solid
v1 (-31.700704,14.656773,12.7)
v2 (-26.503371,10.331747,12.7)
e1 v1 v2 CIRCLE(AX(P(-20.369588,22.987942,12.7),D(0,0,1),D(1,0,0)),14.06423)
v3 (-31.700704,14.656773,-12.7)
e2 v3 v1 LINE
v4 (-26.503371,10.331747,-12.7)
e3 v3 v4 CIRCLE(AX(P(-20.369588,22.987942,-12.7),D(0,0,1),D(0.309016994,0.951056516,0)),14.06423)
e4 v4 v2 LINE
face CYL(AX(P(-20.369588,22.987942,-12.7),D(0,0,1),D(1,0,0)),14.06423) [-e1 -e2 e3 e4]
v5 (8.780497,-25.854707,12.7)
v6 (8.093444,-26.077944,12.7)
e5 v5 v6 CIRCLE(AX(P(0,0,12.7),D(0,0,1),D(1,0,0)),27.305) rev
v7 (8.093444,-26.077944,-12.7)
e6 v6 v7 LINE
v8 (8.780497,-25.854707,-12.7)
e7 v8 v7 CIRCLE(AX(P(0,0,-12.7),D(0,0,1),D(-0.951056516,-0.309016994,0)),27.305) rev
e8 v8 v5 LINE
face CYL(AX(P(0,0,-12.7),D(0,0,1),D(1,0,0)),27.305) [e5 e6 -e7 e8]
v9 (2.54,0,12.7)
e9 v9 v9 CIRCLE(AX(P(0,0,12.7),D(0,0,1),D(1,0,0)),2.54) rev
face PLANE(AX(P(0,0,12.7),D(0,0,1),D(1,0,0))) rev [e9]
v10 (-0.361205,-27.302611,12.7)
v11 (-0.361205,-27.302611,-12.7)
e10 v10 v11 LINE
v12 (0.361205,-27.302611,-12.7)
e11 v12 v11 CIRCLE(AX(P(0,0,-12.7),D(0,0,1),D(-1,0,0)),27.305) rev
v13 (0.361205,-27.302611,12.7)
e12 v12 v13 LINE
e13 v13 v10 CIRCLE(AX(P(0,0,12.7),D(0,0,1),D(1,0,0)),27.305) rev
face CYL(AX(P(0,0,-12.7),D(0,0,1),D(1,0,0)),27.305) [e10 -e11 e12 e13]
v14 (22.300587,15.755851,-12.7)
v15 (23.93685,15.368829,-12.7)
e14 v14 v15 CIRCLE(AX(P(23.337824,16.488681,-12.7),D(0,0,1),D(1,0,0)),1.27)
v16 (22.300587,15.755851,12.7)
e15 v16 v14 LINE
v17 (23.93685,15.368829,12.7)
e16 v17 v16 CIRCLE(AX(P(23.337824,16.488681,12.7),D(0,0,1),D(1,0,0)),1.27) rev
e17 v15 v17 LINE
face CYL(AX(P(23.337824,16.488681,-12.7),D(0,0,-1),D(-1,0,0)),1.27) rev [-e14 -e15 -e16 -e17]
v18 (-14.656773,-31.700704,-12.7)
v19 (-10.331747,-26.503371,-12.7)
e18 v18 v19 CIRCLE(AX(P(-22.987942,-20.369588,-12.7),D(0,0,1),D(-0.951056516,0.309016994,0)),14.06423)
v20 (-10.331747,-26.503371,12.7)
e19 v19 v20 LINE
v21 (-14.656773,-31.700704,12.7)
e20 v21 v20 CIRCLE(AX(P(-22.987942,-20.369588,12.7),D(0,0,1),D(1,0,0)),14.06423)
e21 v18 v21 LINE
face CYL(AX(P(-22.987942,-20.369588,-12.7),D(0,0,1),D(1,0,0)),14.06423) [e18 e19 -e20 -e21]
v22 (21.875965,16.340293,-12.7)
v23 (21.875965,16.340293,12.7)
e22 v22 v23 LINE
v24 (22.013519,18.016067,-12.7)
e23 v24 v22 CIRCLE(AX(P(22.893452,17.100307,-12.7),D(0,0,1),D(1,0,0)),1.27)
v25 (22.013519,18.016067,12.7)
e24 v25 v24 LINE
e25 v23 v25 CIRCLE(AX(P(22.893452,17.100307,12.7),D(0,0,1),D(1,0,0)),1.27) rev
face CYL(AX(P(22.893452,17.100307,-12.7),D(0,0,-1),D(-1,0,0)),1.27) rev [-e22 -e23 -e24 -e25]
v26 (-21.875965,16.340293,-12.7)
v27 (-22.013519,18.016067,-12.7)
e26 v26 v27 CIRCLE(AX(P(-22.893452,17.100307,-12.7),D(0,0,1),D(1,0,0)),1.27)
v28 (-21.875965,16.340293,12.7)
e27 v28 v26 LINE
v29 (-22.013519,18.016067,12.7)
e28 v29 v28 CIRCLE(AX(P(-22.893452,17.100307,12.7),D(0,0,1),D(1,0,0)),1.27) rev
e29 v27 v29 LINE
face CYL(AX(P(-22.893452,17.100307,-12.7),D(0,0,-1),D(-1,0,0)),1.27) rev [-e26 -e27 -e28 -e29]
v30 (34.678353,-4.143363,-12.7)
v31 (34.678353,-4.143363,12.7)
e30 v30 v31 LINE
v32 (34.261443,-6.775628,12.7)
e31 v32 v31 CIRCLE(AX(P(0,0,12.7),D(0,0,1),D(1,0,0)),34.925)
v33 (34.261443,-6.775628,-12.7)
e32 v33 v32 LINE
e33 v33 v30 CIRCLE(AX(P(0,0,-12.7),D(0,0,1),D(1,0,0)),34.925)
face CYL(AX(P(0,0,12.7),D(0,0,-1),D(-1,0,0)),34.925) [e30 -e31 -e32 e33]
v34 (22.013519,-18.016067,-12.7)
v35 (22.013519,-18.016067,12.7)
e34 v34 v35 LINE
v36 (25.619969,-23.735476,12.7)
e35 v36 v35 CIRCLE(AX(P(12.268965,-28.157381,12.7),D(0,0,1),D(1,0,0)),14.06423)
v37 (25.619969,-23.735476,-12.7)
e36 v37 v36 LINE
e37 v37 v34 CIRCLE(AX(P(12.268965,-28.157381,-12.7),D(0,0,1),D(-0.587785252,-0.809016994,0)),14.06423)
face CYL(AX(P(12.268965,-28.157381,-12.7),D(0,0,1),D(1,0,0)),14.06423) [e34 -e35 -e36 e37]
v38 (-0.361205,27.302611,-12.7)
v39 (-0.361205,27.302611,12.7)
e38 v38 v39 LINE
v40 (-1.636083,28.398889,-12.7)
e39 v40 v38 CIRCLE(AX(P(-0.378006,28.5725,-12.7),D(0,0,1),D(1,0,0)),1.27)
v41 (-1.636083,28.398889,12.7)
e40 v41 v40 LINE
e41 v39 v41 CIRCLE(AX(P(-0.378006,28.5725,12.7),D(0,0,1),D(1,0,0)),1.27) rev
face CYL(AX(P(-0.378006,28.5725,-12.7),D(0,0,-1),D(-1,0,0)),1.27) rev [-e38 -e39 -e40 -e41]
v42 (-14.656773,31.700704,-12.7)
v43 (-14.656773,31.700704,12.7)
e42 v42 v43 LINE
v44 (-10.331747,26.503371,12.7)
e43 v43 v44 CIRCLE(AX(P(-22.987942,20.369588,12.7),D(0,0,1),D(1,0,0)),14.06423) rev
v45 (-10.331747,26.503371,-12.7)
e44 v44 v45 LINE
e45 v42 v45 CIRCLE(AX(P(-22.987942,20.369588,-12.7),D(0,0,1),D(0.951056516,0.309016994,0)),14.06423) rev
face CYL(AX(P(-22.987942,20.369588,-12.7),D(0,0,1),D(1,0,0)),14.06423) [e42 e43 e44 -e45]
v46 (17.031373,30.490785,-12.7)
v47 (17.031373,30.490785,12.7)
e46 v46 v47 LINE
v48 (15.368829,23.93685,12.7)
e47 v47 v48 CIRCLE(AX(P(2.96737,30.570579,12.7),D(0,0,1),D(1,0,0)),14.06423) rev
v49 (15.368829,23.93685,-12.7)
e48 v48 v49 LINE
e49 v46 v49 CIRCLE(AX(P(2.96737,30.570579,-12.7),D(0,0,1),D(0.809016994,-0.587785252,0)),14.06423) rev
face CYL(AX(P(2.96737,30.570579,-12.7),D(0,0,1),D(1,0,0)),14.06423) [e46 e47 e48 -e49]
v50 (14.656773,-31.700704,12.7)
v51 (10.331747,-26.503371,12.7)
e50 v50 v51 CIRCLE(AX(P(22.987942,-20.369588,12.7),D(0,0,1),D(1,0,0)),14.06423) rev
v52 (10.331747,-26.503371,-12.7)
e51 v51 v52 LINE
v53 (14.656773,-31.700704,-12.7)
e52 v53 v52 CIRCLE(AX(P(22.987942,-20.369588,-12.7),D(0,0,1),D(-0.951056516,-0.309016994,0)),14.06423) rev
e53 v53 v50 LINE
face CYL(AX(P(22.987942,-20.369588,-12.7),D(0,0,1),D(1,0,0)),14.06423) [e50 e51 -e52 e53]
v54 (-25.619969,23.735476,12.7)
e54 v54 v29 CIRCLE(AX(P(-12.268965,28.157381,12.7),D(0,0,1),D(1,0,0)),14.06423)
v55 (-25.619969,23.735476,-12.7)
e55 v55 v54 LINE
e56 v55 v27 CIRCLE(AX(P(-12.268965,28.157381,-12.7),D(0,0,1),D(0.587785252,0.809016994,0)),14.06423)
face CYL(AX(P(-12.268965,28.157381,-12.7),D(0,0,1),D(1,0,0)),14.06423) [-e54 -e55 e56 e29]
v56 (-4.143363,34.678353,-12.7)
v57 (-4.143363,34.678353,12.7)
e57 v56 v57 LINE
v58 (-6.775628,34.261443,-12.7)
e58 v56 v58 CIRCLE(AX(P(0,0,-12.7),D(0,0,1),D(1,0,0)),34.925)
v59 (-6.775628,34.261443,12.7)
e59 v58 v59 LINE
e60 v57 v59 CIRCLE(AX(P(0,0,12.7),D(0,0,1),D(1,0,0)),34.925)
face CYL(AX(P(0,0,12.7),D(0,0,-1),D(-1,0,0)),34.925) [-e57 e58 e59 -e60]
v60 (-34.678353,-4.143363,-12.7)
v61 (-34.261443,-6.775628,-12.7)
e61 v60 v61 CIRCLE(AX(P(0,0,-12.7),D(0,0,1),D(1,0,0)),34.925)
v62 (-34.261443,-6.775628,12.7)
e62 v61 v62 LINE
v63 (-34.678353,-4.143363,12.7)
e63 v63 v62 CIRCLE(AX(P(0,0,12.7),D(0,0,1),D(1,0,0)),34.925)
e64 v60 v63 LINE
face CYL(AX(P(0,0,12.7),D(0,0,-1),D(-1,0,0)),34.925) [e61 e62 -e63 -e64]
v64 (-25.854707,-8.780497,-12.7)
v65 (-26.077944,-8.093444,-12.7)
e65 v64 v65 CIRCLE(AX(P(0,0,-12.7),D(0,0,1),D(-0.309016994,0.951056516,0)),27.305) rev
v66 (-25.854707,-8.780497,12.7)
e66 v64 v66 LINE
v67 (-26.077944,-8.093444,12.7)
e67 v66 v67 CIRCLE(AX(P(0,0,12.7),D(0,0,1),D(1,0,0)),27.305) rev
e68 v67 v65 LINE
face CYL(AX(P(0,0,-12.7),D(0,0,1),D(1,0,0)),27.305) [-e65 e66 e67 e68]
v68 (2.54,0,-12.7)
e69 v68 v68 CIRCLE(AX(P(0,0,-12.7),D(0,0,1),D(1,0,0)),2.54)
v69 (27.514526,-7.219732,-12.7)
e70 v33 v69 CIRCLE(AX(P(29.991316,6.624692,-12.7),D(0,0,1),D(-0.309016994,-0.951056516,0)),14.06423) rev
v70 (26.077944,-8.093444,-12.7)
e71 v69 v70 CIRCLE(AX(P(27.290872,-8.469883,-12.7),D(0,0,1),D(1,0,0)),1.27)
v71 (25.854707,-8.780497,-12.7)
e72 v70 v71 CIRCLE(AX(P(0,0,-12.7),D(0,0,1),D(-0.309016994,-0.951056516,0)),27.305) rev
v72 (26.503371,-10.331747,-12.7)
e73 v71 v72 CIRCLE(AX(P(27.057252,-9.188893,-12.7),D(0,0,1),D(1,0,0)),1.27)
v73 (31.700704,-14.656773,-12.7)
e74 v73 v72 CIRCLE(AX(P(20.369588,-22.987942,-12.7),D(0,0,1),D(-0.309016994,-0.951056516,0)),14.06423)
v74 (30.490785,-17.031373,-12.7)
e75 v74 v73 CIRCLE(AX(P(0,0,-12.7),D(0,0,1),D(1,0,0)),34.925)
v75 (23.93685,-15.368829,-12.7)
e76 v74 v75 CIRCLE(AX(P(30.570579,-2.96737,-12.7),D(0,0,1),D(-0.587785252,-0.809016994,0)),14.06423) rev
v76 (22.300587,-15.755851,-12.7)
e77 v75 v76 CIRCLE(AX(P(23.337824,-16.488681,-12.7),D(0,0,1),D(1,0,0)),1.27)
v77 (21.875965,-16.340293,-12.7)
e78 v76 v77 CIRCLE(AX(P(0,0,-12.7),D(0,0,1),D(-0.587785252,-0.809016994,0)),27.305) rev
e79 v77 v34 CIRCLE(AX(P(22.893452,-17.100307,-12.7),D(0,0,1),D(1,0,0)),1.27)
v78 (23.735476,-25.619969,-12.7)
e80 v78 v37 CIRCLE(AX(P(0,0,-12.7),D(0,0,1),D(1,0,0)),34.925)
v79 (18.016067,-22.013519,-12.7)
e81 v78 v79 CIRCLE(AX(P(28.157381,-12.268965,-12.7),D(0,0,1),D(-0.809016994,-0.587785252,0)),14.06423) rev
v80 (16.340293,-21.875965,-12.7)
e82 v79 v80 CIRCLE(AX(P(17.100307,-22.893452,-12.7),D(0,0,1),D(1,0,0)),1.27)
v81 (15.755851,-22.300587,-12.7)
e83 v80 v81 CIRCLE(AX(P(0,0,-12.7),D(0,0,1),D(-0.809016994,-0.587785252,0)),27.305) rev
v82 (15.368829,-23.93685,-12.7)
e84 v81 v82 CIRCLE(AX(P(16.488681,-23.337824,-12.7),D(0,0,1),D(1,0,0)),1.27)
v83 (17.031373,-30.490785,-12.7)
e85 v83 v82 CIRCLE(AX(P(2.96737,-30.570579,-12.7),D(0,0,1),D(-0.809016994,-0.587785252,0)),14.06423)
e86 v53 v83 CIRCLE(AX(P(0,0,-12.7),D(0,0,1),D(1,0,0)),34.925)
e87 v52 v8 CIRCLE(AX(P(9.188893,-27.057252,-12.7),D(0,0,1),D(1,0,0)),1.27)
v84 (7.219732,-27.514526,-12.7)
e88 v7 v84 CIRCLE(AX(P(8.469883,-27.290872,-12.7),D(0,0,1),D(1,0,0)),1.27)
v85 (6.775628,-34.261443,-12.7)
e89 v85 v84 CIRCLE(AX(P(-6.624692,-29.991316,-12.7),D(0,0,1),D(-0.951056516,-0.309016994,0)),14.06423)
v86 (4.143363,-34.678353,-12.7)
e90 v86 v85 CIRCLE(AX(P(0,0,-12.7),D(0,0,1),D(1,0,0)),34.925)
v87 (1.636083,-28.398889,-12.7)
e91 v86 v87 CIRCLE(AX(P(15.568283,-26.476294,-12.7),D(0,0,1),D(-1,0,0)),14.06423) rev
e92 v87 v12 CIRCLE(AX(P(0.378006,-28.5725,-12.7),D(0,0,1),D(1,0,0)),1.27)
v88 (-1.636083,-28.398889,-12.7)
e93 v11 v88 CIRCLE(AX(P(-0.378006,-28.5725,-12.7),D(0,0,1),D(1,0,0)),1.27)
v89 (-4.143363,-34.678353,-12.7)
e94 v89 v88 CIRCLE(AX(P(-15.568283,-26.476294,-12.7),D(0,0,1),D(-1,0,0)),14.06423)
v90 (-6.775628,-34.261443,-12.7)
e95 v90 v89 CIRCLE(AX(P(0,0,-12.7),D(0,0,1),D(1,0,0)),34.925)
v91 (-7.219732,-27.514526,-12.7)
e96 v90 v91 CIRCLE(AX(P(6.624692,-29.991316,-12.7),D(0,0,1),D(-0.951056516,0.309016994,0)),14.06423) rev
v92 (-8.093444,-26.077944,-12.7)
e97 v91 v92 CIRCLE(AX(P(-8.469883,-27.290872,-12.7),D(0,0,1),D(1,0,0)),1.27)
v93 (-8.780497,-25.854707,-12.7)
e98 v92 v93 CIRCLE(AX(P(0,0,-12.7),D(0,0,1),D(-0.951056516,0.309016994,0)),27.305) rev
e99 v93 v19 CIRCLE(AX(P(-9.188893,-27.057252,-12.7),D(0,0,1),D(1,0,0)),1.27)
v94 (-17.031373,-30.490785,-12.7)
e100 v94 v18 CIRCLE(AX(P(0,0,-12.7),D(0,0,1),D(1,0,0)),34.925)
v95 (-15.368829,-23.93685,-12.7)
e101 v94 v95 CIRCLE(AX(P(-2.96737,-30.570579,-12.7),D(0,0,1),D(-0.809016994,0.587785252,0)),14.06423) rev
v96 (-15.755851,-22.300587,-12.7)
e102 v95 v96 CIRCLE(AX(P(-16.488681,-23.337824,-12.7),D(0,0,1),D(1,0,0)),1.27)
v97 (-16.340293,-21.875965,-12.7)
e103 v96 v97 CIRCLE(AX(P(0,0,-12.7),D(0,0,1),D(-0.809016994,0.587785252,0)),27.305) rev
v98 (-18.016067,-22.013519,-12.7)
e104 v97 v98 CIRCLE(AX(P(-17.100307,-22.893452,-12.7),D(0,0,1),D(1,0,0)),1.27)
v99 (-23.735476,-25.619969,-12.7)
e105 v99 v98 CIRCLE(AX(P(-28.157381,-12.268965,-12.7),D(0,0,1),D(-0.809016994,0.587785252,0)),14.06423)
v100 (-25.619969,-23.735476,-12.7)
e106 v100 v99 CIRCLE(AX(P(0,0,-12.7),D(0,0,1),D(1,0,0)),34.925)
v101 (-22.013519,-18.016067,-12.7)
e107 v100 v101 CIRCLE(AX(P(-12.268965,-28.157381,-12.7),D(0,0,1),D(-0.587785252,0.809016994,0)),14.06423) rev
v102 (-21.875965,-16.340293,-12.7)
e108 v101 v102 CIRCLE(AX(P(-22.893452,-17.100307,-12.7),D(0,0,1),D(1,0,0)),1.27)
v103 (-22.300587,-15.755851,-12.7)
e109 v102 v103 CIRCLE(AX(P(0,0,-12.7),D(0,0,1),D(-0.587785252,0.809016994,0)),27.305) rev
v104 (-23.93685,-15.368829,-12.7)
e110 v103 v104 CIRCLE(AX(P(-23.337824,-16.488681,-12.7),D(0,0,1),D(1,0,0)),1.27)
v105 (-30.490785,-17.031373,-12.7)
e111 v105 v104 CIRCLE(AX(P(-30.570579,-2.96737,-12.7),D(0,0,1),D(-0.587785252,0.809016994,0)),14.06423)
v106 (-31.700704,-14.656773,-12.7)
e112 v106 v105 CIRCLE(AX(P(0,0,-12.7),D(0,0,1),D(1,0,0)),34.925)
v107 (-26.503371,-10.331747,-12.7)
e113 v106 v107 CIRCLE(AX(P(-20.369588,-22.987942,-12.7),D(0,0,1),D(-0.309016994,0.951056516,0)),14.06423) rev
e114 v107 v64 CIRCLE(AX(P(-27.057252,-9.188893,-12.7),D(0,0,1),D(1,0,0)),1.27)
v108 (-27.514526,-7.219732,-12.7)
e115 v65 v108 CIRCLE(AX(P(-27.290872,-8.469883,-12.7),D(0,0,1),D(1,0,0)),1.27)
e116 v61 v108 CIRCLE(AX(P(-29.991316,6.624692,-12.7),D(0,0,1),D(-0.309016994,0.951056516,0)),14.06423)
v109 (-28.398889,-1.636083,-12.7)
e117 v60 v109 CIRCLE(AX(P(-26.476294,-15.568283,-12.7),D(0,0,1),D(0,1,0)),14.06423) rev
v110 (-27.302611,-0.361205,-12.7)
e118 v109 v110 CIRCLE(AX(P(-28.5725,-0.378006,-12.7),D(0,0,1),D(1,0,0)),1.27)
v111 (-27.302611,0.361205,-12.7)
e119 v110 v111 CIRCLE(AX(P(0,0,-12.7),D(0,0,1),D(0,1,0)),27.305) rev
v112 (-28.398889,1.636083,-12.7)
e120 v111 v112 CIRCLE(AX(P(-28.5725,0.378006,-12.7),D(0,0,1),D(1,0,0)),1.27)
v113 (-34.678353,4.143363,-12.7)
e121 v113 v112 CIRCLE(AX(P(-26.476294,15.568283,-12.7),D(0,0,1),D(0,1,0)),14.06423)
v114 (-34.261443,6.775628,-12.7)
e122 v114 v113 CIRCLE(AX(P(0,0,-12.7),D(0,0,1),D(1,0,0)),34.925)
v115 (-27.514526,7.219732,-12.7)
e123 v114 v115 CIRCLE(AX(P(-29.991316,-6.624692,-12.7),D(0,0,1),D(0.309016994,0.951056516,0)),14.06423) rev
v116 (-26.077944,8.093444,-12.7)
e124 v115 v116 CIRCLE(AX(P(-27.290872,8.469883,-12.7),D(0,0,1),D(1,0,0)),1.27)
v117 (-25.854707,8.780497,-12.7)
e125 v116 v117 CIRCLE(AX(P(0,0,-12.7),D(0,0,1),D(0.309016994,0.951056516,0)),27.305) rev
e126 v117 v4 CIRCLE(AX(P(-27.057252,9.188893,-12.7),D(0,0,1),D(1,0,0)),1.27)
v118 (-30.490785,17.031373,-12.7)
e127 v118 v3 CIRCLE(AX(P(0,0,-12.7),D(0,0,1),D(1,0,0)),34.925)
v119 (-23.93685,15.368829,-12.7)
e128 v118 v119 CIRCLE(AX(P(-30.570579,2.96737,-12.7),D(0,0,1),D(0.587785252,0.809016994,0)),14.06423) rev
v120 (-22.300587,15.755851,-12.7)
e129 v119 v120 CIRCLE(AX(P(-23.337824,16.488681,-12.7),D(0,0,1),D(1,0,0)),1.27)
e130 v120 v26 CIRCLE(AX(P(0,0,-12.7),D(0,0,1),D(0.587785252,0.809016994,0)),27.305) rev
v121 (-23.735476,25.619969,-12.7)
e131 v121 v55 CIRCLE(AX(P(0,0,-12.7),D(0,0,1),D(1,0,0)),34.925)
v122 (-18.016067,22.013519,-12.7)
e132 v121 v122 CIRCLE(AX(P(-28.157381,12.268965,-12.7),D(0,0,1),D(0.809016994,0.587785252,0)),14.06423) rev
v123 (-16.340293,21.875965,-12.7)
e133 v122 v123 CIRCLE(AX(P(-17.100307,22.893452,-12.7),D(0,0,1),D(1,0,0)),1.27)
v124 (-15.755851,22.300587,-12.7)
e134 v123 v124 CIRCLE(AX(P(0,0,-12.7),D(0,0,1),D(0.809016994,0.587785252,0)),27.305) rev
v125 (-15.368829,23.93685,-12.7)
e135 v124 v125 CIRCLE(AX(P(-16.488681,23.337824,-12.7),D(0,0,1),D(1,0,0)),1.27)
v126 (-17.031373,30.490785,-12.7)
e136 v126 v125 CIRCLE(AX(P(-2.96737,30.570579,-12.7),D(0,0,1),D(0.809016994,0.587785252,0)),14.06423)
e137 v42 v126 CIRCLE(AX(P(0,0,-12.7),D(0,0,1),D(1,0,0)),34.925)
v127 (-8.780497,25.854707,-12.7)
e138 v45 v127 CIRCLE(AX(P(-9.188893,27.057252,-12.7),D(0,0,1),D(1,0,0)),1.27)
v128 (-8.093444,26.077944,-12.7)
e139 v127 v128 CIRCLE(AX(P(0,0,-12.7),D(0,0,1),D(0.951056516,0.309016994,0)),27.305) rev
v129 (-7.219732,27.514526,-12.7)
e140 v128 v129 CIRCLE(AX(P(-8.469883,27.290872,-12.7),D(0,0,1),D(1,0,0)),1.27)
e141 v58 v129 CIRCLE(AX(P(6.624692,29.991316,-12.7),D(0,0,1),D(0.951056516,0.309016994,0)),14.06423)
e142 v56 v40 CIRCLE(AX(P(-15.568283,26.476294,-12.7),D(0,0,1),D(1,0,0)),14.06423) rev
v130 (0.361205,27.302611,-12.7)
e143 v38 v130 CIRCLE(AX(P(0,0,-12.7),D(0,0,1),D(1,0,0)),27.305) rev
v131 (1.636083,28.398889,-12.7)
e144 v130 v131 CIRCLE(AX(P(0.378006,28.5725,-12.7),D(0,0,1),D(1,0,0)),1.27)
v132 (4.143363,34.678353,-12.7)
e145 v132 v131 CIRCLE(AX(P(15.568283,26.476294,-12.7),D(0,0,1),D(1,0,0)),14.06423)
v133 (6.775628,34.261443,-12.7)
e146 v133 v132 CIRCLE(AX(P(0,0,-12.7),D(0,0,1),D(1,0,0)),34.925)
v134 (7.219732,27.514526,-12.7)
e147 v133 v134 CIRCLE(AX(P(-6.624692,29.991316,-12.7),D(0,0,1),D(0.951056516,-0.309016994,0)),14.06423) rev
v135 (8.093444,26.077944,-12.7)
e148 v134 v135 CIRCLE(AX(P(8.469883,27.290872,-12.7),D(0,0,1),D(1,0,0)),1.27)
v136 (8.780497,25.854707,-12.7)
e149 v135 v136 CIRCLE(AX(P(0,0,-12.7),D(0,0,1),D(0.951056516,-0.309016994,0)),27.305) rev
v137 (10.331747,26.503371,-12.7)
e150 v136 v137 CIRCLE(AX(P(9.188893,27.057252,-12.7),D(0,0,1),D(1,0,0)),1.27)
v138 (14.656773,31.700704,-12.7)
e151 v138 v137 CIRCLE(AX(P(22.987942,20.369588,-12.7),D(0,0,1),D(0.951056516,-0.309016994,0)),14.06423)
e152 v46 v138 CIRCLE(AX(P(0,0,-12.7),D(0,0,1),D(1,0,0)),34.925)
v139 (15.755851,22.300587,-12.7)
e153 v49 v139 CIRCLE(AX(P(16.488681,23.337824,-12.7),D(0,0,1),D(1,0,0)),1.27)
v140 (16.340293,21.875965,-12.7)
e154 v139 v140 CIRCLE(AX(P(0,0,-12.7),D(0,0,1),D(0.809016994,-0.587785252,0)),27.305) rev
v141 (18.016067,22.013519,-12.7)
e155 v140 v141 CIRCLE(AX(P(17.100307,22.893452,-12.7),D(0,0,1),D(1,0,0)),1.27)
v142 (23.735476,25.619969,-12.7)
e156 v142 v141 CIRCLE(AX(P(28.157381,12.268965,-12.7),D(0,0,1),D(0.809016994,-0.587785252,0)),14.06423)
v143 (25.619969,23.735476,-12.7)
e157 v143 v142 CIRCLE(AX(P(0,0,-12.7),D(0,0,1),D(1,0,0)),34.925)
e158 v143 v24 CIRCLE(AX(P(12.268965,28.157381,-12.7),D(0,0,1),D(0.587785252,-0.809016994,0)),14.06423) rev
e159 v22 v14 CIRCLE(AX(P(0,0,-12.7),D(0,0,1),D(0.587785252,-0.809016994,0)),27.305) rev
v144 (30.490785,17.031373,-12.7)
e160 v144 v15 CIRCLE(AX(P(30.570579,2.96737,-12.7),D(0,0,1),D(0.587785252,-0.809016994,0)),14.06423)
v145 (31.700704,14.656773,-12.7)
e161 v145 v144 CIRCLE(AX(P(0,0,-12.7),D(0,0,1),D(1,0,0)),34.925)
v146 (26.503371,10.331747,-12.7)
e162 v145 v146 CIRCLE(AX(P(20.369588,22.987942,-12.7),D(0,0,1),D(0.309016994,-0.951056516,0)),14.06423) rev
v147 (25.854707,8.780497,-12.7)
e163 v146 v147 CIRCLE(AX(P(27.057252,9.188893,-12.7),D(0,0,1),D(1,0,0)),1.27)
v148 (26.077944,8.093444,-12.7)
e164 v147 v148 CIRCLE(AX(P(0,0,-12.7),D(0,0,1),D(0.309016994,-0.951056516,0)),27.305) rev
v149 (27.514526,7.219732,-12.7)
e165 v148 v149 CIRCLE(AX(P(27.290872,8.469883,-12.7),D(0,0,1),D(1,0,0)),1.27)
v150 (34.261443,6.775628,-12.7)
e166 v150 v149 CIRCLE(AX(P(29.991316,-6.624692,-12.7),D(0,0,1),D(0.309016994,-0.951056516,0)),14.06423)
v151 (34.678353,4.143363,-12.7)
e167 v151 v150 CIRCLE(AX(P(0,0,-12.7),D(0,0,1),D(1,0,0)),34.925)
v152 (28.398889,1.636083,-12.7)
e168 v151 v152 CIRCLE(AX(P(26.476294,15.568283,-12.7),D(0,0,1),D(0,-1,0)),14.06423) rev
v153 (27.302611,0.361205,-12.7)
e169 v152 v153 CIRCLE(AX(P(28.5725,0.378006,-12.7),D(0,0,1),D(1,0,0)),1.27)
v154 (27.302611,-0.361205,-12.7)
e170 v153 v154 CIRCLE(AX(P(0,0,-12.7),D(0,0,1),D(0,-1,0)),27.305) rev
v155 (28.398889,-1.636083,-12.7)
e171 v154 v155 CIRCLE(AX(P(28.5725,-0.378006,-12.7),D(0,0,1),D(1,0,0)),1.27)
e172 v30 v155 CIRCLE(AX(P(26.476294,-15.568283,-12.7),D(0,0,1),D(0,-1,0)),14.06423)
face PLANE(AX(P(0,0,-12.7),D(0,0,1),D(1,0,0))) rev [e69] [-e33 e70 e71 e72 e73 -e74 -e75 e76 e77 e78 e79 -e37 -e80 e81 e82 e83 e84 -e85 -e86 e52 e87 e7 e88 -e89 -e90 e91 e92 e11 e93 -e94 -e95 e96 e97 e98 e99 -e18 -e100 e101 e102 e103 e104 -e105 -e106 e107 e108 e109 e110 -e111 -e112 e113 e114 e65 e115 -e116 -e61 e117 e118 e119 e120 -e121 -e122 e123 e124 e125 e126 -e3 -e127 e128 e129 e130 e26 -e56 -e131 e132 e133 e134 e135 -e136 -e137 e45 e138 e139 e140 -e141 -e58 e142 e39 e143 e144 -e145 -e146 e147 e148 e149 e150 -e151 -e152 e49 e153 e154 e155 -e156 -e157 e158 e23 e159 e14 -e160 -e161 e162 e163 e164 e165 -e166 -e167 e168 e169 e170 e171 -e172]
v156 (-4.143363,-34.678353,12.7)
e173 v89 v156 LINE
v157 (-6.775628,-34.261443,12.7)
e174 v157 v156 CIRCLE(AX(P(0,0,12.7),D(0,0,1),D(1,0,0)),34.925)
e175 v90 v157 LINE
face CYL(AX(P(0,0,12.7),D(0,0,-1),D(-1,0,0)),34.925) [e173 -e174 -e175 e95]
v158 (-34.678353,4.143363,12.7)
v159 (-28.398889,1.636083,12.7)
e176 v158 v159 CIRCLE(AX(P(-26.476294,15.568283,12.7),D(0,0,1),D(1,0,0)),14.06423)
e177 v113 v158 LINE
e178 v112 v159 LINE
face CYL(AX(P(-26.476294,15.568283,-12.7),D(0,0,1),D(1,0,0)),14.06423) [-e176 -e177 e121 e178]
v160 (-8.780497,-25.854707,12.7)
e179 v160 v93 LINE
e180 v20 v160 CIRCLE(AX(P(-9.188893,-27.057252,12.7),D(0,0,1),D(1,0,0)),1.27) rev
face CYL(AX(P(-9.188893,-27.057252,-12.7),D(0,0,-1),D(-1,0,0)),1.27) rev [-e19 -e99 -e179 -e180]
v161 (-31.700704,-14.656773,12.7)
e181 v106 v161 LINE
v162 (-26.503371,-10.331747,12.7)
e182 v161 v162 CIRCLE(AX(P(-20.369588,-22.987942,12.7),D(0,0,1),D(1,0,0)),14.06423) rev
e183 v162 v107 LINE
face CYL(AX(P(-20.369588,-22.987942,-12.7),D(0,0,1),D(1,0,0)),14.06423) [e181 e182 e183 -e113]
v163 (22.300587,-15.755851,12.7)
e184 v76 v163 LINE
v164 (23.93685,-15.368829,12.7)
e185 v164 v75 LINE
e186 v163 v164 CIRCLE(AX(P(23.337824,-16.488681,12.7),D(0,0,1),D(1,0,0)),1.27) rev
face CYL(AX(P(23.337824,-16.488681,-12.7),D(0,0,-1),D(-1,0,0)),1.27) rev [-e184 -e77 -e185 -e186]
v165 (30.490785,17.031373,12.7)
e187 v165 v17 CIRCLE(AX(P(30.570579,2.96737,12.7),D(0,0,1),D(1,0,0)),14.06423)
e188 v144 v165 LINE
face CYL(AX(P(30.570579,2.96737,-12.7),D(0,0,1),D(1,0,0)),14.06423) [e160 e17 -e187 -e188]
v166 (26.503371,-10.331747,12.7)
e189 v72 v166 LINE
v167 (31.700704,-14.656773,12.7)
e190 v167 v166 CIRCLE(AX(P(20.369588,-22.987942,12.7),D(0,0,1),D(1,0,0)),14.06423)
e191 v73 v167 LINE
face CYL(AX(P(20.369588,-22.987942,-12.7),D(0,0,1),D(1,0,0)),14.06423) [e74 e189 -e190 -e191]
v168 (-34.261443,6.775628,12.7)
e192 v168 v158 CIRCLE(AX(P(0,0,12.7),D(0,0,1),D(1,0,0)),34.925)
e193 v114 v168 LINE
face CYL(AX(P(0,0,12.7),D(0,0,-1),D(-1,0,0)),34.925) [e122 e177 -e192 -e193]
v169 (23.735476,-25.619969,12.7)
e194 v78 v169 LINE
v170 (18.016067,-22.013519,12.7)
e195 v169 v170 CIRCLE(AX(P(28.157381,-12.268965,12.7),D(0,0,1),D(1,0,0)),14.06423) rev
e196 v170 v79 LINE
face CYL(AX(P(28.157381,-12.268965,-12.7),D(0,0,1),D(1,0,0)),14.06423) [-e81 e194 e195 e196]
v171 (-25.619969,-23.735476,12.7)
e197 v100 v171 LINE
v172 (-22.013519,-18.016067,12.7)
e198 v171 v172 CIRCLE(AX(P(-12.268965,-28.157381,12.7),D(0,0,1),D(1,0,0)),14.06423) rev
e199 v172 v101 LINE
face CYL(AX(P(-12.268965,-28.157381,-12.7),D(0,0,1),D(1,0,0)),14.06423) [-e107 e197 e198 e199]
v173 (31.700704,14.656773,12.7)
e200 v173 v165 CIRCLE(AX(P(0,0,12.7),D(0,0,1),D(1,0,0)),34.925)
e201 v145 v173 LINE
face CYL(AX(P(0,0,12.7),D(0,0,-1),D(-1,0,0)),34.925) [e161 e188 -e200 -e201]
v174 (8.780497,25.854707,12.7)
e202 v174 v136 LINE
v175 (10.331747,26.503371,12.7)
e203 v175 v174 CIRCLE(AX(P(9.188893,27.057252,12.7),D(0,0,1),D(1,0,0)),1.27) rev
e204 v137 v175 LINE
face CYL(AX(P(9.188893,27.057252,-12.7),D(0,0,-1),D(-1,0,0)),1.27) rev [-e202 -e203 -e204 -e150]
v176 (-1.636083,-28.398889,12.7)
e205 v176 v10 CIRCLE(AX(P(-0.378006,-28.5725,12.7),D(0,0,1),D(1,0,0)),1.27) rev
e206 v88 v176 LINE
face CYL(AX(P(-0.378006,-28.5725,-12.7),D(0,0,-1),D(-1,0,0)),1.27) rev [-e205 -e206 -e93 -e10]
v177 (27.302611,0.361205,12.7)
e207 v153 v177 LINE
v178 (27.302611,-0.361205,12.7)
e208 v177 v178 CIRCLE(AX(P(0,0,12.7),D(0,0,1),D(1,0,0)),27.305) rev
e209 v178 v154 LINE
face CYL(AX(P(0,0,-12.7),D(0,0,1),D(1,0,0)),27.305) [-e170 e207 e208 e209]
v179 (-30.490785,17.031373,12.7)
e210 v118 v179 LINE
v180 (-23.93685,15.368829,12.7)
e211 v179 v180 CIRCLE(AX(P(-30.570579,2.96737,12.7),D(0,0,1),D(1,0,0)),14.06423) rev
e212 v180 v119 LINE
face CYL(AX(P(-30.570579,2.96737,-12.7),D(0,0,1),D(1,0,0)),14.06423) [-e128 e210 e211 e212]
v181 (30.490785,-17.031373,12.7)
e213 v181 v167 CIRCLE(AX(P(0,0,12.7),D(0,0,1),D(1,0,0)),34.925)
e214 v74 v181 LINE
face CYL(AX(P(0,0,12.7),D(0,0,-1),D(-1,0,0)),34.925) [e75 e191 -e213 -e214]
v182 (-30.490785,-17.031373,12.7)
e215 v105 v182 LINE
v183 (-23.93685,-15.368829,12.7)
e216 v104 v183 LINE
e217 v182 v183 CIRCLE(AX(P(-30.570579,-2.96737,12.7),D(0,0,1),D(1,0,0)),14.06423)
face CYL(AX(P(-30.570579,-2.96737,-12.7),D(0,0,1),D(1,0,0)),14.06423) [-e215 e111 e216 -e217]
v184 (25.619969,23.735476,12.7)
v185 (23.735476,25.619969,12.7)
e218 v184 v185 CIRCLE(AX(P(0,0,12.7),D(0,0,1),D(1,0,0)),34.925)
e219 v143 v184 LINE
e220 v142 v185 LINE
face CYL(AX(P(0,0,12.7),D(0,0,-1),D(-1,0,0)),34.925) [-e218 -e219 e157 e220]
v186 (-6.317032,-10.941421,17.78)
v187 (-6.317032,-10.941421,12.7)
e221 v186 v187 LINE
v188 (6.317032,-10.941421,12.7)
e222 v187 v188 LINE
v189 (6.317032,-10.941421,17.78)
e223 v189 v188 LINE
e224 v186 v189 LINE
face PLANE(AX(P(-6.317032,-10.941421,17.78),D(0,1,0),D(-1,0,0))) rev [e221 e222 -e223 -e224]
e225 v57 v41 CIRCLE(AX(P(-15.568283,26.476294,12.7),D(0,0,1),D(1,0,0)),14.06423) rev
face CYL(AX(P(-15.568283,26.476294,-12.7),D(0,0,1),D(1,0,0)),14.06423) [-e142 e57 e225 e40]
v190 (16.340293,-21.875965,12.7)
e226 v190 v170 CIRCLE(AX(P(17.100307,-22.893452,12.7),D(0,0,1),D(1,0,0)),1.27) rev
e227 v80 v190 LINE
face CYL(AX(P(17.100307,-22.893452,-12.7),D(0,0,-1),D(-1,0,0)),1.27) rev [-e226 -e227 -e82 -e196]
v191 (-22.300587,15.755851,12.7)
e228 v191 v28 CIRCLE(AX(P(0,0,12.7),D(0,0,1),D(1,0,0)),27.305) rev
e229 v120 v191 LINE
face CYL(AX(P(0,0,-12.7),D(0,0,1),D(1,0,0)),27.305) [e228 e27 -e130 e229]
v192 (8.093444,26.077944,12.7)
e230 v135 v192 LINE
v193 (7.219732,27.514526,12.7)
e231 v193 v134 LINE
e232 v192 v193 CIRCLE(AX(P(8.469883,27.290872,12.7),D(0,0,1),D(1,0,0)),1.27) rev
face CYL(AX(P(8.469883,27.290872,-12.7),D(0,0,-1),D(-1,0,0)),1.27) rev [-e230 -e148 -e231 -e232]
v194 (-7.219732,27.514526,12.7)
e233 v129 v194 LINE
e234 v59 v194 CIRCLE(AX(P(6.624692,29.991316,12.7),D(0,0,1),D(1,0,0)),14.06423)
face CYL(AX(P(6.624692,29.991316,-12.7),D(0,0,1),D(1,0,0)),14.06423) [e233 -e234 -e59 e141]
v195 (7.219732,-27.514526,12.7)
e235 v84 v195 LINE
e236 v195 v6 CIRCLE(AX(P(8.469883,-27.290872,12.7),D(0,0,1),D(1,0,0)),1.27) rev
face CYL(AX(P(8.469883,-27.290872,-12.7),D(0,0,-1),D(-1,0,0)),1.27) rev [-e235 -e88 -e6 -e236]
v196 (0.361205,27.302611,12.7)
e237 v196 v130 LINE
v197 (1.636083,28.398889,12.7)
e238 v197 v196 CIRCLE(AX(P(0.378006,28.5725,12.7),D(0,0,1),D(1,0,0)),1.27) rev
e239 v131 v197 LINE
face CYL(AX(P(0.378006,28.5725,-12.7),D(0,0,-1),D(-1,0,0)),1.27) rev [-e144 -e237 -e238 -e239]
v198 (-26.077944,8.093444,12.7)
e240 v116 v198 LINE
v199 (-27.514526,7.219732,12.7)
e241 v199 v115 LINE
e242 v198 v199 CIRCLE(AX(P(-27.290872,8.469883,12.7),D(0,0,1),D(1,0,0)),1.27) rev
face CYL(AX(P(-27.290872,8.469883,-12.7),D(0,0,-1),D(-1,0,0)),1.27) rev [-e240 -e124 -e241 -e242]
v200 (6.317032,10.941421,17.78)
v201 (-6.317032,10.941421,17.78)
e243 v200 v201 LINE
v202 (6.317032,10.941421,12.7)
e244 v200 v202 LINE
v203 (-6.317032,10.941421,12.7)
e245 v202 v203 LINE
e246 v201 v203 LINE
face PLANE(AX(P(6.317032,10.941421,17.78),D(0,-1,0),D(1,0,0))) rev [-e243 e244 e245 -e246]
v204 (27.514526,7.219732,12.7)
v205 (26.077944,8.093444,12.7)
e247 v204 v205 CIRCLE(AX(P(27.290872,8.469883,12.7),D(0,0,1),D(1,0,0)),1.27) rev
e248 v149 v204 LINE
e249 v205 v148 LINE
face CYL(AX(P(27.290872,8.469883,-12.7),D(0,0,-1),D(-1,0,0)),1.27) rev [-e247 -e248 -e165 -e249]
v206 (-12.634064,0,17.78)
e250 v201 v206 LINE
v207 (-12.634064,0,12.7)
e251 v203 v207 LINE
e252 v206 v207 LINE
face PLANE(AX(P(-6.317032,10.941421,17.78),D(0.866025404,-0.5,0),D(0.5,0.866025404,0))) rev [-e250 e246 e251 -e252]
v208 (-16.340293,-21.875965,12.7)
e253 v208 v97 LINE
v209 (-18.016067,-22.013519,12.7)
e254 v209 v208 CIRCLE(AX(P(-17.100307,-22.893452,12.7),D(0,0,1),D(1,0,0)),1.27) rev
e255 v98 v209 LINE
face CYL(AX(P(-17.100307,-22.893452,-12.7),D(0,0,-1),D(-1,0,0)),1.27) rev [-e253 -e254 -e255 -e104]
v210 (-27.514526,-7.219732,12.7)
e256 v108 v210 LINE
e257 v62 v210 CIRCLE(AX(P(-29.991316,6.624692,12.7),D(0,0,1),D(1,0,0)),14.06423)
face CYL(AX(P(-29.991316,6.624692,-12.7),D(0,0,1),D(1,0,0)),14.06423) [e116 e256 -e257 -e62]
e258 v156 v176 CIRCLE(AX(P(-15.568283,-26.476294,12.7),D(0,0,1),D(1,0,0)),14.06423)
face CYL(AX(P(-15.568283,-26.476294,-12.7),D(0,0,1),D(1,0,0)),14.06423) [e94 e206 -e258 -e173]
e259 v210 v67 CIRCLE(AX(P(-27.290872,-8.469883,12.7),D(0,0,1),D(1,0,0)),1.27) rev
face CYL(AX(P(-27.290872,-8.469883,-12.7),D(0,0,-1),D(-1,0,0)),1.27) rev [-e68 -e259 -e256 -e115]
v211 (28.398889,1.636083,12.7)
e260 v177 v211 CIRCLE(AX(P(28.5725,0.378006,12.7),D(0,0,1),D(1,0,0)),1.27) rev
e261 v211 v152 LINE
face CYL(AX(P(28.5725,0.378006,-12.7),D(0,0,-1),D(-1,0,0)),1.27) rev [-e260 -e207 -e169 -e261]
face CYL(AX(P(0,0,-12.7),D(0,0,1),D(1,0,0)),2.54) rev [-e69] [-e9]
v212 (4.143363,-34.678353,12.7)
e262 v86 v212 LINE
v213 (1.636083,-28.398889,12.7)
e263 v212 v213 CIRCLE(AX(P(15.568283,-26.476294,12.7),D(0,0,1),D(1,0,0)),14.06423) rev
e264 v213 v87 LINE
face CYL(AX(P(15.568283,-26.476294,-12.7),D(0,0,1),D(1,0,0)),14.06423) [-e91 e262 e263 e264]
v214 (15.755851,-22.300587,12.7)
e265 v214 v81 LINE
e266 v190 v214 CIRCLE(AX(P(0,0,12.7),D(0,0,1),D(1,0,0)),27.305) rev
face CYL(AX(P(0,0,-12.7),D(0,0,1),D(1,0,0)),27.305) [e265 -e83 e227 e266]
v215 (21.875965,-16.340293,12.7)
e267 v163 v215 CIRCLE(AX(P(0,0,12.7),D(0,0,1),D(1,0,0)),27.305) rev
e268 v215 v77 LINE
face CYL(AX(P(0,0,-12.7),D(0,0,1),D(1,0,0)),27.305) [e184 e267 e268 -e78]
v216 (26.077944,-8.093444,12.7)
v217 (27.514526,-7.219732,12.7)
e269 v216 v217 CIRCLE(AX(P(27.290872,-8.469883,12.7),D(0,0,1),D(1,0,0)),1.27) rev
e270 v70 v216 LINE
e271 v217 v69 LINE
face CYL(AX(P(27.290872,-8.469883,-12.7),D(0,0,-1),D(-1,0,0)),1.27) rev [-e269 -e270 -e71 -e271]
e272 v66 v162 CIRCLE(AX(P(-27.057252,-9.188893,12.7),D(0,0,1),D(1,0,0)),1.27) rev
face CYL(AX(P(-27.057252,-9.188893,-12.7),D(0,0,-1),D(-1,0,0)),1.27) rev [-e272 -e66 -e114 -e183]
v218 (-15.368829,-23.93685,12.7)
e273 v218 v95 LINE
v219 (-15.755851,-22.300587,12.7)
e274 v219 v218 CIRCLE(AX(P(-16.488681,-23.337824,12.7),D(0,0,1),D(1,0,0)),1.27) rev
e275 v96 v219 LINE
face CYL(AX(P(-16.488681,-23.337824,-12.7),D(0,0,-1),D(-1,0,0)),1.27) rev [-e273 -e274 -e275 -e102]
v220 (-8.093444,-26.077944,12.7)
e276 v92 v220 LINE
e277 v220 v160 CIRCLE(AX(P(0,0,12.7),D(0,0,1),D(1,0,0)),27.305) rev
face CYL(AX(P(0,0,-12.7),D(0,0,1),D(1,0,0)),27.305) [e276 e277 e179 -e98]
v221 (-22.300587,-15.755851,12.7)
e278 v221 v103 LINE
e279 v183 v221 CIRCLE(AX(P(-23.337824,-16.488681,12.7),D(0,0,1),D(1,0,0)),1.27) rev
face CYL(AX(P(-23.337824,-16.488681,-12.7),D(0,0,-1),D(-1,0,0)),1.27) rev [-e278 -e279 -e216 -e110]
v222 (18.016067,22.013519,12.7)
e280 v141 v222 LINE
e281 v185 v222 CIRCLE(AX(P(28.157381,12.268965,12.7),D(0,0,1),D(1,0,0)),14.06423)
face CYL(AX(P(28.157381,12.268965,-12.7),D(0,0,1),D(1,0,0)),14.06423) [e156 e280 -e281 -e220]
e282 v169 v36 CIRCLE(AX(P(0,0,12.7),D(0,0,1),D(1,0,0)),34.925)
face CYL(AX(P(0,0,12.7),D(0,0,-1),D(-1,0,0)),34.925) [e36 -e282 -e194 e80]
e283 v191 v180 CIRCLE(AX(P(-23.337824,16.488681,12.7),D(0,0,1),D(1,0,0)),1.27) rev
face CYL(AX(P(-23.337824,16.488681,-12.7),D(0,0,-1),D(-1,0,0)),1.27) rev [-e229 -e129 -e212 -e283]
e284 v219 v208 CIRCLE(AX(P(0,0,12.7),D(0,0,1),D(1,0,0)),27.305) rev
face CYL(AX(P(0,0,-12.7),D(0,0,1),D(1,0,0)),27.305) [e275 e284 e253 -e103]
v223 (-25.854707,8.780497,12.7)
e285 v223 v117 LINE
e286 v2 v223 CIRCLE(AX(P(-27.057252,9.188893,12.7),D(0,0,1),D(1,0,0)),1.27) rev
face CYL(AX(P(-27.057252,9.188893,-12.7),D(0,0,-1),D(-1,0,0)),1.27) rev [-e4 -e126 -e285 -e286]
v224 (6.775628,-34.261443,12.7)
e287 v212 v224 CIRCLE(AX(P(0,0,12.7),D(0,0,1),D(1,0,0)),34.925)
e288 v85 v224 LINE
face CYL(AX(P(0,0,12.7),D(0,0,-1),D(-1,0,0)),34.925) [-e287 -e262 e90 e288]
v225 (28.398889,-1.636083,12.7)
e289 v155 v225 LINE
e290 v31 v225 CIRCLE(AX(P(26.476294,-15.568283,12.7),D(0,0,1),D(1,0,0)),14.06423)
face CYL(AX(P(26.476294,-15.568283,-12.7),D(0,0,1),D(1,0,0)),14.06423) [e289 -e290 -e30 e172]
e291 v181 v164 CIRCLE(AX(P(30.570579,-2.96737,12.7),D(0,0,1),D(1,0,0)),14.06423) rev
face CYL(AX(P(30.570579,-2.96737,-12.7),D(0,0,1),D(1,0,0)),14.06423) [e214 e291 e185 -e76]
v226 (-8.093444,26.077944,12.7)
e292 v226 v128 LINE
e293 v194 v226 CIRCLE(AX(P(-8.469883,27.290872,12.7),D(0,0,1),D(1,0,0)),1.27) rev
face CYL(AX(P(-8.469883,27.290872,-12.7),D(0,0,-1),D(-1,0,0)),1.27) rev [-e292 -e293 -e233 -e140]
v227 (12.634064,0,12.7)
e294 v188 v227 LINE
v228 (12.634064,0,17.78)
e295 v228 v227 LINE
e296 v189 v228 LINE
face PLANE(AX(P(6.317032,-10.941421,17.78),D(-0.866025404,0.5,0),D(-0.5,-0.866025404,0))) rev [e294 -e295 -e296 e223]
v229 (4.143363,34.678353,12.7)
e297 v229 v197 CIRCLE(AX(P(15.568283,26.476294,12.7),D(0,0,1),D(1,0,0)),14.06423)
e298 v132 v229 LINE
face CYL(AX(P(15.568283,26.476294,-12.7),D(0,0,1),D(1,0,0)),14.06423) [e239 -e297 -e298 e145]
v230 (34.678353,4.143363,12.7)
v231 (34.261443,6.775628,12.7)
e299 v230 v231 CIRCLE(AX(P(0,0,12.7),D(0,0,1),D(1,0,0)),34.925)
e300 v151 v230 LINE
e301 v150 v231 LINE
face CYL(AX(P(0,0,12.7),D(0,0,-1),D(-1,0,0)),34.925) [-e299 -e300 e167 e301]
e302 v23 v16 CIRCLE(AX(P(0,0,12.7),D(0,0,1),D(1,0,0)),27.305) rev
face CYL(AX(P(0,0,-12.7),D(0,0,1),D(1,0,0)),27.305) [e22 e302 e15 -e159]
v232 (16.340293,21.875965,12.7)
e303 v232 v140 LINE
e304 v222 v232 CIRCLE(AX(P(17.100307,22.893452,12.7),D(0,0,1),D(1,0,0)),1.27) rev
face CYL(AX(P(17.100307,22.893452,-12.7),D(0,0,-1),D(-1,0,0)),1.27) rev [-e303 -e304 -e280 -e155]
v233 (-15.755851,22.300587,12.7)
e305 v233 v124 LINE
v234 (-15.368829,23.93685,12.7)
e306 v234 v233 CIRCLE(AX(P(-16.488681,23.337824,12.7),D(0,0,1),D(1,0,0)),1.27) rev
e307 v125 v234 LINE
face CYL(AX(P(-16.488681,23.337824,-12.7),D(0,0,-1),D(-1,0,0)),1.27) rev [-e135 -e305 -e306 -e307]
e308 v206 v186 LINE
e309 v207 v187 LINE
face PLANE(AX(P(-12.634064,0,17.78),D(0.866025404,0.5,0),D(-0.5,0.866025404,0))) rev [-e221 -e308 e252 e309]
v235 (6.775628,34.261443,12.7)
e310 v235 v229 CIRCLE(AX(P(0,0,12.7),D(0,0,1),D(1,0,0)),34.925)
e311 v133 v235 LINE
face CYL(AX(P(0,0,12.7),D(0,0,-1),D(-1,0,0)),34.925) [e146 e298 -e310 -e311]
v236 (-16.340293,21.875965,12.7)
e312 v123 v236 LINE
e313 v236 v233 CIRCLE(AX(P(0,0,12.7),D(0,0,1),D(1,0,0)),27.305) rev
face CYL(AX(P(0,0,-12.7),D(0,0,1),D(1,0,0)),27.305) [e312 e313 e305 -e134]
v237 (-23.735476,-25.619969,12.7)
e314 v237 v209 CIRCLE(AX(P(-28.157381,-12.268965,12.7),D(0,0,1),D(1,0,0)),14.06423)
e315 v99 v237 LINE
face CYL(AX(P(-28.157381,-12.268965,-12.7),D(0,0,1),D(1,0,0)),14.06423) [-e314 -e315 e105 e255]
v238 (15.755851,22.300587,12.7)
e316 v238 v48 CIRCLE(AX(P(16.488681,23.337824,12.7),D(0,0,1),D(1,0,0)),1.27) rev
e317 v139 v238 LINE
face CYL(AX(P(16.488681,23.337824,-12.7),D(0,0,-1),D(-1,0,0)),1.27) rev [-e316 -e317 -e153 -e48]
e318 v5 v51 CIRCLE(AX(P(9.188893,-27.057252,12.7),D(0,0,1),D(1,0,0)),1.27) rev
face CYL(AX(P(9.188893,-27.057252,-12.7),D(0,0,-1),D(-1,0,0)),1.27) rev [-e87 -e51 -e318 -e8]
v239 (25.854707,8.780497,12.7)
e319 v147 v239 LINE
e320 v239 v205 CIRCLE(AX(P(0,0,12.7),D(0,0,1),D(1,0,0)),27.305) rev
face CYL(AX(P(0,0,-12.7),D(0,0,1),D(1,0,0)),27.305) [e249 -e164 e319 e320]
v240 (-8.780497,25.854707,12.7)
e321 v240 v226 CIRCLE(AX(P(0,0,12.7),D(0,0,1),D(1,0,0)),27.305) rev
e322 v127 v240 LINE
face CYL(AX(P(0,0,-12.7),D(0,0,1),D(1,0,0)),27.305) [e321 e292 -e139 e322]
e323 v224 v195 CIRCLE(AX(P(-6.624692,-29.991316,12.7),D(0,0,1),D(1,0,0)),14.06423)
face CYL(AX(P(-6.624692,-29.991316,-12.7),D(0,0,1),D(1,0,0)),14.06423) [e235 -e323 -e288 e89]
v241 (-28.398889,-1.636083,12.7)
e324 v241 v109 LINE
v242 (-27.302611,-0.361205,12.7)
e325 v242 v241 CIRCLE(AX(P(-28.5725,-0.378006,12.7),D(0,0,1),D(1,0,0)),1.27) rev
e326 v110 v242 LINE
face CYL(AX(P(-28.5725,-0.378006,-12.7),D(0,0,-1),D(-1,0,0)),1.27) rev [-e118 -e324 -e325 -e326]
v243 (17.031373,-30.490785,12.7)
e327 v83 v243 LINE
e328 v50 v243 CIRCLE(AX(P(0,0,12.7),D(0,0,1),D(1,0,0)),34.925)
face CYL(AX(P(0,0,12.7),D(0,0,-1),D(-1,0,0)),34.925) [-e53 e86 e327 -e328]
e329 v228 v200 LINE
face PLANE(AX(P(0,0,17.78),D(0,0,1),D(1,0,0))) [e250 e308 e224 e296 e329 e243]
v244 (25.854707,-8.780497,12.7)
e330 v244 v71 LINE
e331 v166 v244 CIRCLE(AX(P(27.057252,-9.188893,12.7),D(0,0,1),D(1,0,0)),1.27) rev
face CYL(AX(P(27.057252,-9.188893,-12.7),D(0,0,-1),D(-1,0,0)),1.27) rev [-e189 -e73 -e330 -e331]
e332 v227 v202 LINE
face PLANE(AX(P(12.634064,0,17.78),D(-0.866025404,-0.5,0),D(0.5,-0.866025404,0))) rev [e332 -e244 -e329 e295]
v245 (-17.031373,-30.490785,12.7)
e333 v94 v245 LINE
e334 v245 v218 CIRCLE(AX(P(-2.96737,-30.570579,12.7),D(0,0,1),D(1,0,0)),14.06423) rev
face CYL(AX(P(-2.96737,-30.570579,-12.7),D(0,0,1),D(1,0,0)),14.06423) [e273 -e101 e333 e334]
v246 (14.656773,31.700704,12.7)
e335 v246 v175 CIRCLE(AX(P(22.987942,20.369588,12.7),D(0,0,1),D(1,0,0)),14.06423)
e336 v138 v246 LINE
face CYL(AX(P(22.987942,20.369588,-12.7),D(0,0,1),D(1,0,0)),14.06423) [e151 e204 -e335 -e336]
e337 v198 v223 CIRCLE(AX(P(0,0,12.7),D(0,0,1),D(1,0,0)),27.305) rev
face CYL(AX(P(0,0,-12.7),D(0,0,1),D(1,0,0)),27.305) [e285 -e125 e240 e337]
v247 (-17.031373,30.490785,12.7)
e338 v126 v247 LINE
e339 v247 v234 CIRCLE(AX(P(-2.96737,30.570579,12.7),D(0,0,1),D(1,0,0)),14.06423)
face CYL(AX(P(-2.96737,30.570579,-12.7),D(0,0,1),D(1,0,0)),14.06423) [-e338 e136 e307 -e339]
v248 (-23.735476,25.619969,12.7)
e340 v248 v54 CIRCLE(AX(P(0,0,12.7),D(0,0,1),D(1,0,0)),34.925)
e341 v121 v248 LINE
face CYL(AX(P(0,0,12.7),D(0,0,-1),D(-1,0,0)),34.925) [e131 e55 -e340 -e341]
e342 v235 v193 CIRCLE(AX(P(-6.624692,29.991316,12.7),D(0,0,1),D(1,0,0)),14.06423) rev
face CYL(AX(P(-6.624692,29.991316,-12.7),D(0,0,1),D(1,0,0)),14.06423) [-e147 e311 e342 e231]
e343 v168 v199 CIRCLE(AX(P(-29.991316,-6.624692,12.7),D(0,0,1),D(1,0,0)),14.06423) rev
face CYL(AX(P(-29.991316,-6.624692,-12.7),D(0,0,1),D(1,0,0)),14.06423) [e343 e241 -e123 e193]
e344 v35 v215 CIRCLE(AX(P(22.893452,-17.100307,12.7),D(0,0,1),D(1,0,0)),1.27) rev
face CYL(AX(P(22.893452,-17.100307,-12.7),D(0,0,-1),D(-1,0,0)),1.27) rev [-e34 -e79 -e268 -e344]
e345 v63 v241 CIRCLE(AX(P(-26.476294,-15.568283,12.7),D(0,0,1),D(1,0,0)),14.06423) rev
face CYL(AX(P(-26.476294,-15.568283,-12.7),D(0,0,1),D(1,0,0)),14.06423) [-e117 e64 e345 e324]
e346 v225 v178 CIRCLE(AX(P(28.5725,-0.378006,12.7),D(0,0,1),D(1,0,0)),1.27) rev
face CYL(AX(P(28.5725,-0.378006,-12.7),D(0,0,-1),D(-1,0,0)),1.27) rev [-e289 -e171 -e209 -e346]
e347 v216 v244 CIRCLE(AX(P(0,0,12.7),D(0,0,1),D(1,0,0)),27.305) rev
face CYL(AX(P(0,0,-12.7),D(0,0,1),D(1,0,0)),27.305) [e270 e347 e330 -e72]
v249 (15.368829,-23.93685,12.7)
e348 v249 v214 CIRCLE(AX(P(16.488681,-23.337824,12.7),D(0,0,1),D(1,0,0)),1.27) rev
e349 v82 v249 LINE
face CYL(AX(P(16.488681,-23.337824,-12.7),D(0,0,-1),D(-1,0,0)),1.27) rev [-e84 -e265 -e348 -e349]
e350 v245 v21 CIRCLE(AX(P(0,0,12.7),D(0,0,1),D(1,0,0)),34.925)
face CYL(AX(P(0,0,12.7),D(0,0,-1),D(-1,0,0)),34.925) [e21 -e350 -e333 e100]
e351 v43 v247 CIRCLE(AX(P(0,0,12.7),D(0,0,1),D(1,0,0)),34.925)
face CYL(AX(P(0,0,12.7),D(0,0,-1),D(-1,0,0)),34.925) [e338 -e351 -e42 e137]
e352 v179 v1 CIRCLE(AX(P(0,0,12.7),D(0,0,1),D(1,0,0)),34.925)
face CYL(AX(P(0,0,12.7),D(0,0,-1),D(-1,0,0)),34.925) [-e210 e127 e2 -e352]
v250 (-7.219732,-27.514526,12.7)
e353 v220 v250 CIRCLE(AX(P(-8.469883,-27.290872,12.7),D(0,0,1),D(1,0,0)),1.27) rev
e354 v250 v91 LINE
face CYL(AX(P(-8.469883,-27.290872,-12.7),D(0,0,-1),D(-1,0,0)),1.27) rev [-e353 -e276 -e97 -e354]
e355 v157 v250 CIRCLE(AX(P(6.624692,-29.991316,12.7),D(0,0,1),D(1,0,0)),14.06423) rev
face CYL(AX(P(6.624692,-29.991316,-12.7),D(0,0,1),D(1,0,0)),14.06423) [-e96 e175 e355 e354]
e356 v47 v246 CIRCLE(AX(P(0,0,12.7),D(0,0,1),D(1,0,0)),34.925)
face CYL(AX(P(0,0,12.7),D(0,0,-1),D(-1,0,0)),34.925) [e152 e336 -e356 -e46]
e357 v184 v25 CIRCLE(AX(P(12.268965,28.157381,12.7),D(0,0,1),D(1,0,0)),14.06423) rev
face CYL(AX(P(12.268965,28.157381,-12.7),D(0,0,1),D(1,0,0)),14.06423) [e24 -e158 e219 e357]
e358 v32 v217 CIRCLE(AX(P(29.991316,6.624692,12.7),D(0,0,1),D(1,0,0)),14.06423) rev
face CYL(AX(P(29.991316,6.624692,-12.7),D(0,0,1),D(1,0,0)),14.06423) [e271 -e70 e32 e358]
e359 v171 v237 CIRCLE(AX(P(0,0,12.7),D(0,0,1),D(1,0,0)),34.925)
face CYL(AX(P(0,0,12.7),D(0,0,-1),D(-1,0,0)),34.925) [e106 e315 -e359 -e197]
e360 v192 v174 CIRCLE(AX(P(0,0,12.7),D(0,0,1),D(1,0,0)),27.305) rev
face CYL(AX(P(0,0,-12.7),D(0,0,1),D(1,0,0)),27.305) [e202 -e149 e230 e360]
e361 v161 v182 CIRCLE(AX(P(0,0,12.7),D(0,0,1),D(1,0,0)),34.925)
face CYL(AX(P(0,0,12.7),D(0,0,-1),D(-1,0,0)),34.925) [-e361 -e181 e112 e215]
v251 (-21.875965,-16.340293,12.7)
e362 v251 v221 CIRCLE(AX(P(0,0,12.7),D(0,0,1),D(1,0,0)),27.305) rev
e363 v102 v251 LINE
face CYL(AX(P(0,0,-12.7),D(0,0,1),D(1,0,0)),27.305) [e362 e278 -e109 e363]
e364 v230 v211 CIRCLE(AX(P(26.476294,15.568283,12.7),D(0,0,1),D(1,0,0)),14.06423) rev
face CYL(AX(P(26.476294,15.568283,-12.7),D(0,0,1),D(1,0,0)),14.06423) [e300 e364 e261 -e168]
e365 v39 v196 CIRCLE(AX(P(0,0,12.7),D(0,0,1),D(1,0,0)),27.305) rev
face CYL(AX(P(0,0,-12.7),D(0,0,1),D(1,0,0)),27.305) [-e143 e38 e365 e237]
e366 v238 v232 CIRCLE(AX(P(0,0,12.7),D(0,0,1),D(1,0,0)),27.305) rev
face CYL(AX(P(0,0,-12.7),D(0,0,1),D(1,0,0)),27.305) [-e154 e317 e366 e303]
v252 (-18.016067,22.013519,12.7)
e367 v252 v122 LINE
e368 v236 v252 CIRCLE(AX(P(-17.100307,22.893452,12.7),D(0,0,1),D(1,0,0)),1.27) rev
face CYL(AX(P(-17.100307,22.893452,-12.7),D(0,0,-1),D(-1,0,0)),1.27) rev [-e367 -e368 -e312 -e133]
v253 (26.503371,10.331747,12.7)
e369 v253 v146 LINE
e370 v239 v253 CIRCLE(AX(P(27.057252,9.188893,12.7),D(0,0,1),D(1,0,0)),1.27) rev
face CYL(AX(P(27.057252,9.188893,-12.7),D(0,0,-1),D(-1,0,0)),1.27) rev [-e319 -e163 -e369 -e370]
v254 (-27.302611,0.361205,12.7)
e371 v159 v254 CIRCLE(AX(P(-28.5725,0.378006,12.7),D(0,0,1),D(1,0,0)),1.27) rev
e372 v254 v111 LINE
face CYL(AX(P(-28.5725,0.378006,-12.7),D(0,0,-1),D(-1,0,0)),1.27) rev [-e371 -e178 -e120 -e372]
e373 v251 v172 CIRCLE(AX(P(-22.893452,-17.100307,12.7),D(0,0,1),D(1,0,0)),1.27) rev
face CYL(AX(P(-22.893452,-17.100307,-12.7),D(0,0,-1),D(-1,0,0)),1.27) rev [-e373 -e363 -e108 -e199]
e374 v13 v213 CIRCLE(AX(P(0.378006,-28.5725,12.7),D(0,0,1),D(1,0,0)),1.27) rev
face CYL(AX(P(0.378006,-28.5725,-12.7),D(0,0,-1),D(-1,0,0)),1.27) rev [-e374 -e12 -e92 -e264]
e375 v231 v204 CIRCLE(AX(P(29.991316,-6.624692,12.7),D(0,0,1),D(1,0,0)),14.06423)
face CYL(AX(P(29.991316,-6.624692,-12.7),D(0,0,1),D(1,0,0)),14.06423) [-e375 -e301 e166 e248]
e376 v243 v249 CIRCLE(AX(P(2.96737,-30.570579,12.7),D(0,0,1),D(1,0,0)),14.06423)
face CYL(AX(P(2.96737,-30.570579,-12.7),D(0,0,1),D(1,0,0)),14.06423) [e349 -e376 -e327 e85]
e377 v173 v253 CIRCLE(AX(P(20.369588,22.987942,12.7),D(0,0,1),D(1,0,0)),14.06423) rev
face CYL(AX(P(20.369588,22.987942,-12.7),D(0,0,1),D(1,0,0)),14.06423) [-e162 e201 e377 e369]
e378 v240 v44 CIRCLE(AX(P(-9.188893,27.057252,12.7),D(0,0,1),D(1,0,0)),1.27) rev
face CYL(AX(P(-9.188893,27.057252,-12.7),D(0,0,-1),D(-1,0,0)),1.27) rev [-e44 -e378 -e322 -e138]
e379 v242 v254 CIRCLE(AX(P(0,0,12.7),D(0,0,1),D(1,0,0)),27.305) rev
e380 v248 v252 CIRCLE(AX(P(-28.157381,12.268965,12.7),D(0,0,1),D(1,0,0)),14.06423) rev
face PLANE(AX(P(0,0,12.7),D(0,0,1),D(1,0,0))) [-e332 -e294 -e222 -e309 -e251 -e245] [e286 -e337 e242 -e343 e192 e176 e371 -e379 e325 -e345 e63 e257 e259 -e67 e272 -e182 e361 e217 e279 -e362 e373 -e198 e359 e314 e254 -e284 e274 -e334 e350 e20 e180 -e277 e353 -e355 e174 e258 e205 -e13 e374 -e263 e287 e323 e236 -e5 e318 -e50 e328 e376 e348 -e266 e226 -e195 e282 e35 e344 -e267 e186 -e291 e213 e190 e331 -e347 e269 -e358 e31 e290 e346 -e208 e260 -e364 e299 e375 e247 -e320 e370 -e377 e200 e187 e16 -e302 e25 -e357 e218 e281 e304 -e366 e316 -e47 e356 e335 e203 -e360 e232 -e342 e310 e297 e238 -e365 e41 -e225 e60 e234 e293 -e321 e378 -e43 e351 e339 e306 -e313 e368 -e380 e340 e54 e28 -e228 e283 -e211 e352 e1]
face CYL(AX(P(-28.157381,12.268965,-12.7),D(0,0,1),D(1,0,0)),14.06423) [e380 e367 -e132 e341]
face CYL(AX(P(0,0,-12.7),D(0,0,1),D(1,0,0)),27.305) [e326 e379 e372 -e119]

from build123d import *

# Parameters (mm, degrees)
SKETCH1_R                = 34.925
BOSS_EXTRUDE2_DEPTH      = 12.7
CUT_EXTRUDE3_START       = -25.4
CUT_EXTRUDE3_DEPTH       = 25.4
FILLET1_R                = 1.27
FILLET2_R                = 1.27
CIRPATTERN2_COUNT        = 20
FILLET1_OF_CIRPATTERN2_R = 1.27
FILLET2_OF_CIRPATTERN2_R = 1.27
CUT_EXTRUDE4_DEPTH       = 51.660303503
CUT_EXTRUDE4_DEPTH_BACK  = 51.660303503
SKETCH1_4_R              = 2.54
BOSS_EXTRUDE3_DEPTH      = 5.08


# Read off the part's stored shape, not the designer's step: Cut-Extrude3
with BuildPart() as part:
    # Sketch1 → Boss-Extrude2 (new, symmetric)
    with BuildSketch(Plane.XY):
        Circle(SKETCH1_R)
    extrude(amount=BOSS_EXTRUDE2_DEPTH, both=True)

    # Cut-Extrude3 outline → Cut-Extrude3 (cut)
    with BuildSketch(Plane.XY.offset(12.7).offset(CUT_EXTRUDE3_START)):
        with BuildLine():
            ThreePointArc((-4.143363091, 34.678353007), (-2.305797051, 31.157002463), (-1.526035224, 27.262322746))
            ThreePointArc((-1.526035224, 27.262322746), (0, 27.305), (1.526035224, 27.262322746))
            ThreePointArc((1.526035224, 27.262322746), (2.305797051, 31.157002463), (4.143363091, 34.678353007))
            ThreePointArc((4.143363091, 34.678353007), (0, 34.925), (-4.143363091, 34.678353007))
        make_face()
    cut_extrude3 = extrude(amount=CUT_EXTRUDE3_DEPTH, mode=Mode.SUBTRACT)

    # Fillet1
    fillet1_edges = [part.edges().sort_by_distance(p)[0] for p in [
        (-1.526035224, 27.262322746, 0),
    ]]
    fillet(fillet1_edges, radius=FILLET1_R)

    # Fillet2
    fillet2_edges = [part.edges().sort_by_distance(p)[0] for p in [
        (1.526035224, 27.262322746, 0),
    ]]
    fillet(fillet2_edges, radius=FILLET2_R)

    # CirPattern2: Cut-Extrude3 ×20 about axis
    cirpattern2_axis = Axis((0, 0, 0), (0, 0, 1))
    for i in range(1, CIRPATTERN2_COUNT):
        add(cut_extrude3.rotate(cirpattern2_axis, i * 360 / CIRPATTERN2_COUNT), mode=Mode.SUBTRACT)

    # Fillet1 of CirPattern2
    fillet1_of_cirpattern2_edges = [part.edges().sort_by_distance(p)[0] for p in [
        (-9.875866779, 25.456438879, 0),
        (-17.258979684, 21.158701409, 0),
        (-22.952663407, 14.789802823, 0),
        (-26.399580515, 6.973175291, 0),
        (-27.262322746, -1.526035224, 0),
        (-25.456438879, -9.875866779, 0),
        (-21.158701409, -17.258979684, 0),
        (-14.789802823, -22.952663407, 0),
        (-6.973175291, -26.399580515, 0),
        (1.526035224, -27.262322746, 0),
        (9.875866779, -25.456438879, 0),
        (17.258979684, -21.158701409, 0),
        (22.952663407, -14.789802823, 0),
        (26.399580515, -6.973175291, 0),
        (27.262322746, 1.526035224, 0),
        (25.456438879, 9.875866779, 0),
        (21.158701409, 17.258979684, 0),
        (14.789802823, 22.952663407, 0),
        (6.973175291, 26.399580515, 0),
    ]]
    fillet(fillet1_of_cirpattern2_edges, radius=FILLET1_OF_CIRPATTERN2_R)

    # Fillet2 of CirPattern2
    fillet2_of_cirpattern2_edges = [part.edges().sort_by_distance(p)[0] for p in [
        (-6.973175291, 26.399580515, 0),
        (-14.789802823, 22.952663407, 0),
        (-21.158701409, 17.258979684, 0),
        (-25.456438879, 9.875866779, 0),
        (-27.262322746, 1.526035224, 0),
        (-26.399580515, -6.973175291, 0),
        (-22.952663407, -14.789802823, 0),
        (-17.258979684, -21.158701409, 0),
        (-9.875866779, -25.456438879, 0),
        (-1.526035224, -27.262322746, 0),
        (6.973175291, -26.399580515, 0),
        (14.789802823, -22.952663407, 0),
        (21.158701409, -17.258979684, 0),
        (25.456438879, -9.875866779, 0),
        (27.262322746, -1.526035224, 0),
        (26.399580515, 6.973175291, 0),
        (22.952663407, 14.789802823, 0),
        (17.258979684, 21.158701409, 0),
        (9.875866779, 25.456438879, 0),
    ]]
    fillet(fillet2_of_cirpattern2_edges, radius=FILLET2_OF_CIRPATTERN2_R)

    # Sketch1<4> → Cut-Extrude4 (cut, two sides: drawn at the far end of the back side and taken through both)
    with BuildSketch(Plane.XY.offset(-CUT_EXTRUDE4_DEPTH_BACK)):
        Circle(SKETCH1_4_R)
    extrude(amount=CUT_EXTRUDE4_DEPTH + CUT_EXTRUDE4_DEPTH_BACK, mode=Mode.SUBTRACT)

    # Sketch3 → Boss-Extrude3 (add)
    with BuildSketch(Plane.XY.offset(12.7)):
        Polygon((12.634064431, 0), (6.317032216, 10.941420751), (-6.317032216, 10.941420751), (-12.634064431, 0), (-6.317032216, -10.941420751), (6.317032216, -10.941420751), align=None)
    extrude(amount=BOSS_EXTRUDE3_DEPTH)


solid = part.part
